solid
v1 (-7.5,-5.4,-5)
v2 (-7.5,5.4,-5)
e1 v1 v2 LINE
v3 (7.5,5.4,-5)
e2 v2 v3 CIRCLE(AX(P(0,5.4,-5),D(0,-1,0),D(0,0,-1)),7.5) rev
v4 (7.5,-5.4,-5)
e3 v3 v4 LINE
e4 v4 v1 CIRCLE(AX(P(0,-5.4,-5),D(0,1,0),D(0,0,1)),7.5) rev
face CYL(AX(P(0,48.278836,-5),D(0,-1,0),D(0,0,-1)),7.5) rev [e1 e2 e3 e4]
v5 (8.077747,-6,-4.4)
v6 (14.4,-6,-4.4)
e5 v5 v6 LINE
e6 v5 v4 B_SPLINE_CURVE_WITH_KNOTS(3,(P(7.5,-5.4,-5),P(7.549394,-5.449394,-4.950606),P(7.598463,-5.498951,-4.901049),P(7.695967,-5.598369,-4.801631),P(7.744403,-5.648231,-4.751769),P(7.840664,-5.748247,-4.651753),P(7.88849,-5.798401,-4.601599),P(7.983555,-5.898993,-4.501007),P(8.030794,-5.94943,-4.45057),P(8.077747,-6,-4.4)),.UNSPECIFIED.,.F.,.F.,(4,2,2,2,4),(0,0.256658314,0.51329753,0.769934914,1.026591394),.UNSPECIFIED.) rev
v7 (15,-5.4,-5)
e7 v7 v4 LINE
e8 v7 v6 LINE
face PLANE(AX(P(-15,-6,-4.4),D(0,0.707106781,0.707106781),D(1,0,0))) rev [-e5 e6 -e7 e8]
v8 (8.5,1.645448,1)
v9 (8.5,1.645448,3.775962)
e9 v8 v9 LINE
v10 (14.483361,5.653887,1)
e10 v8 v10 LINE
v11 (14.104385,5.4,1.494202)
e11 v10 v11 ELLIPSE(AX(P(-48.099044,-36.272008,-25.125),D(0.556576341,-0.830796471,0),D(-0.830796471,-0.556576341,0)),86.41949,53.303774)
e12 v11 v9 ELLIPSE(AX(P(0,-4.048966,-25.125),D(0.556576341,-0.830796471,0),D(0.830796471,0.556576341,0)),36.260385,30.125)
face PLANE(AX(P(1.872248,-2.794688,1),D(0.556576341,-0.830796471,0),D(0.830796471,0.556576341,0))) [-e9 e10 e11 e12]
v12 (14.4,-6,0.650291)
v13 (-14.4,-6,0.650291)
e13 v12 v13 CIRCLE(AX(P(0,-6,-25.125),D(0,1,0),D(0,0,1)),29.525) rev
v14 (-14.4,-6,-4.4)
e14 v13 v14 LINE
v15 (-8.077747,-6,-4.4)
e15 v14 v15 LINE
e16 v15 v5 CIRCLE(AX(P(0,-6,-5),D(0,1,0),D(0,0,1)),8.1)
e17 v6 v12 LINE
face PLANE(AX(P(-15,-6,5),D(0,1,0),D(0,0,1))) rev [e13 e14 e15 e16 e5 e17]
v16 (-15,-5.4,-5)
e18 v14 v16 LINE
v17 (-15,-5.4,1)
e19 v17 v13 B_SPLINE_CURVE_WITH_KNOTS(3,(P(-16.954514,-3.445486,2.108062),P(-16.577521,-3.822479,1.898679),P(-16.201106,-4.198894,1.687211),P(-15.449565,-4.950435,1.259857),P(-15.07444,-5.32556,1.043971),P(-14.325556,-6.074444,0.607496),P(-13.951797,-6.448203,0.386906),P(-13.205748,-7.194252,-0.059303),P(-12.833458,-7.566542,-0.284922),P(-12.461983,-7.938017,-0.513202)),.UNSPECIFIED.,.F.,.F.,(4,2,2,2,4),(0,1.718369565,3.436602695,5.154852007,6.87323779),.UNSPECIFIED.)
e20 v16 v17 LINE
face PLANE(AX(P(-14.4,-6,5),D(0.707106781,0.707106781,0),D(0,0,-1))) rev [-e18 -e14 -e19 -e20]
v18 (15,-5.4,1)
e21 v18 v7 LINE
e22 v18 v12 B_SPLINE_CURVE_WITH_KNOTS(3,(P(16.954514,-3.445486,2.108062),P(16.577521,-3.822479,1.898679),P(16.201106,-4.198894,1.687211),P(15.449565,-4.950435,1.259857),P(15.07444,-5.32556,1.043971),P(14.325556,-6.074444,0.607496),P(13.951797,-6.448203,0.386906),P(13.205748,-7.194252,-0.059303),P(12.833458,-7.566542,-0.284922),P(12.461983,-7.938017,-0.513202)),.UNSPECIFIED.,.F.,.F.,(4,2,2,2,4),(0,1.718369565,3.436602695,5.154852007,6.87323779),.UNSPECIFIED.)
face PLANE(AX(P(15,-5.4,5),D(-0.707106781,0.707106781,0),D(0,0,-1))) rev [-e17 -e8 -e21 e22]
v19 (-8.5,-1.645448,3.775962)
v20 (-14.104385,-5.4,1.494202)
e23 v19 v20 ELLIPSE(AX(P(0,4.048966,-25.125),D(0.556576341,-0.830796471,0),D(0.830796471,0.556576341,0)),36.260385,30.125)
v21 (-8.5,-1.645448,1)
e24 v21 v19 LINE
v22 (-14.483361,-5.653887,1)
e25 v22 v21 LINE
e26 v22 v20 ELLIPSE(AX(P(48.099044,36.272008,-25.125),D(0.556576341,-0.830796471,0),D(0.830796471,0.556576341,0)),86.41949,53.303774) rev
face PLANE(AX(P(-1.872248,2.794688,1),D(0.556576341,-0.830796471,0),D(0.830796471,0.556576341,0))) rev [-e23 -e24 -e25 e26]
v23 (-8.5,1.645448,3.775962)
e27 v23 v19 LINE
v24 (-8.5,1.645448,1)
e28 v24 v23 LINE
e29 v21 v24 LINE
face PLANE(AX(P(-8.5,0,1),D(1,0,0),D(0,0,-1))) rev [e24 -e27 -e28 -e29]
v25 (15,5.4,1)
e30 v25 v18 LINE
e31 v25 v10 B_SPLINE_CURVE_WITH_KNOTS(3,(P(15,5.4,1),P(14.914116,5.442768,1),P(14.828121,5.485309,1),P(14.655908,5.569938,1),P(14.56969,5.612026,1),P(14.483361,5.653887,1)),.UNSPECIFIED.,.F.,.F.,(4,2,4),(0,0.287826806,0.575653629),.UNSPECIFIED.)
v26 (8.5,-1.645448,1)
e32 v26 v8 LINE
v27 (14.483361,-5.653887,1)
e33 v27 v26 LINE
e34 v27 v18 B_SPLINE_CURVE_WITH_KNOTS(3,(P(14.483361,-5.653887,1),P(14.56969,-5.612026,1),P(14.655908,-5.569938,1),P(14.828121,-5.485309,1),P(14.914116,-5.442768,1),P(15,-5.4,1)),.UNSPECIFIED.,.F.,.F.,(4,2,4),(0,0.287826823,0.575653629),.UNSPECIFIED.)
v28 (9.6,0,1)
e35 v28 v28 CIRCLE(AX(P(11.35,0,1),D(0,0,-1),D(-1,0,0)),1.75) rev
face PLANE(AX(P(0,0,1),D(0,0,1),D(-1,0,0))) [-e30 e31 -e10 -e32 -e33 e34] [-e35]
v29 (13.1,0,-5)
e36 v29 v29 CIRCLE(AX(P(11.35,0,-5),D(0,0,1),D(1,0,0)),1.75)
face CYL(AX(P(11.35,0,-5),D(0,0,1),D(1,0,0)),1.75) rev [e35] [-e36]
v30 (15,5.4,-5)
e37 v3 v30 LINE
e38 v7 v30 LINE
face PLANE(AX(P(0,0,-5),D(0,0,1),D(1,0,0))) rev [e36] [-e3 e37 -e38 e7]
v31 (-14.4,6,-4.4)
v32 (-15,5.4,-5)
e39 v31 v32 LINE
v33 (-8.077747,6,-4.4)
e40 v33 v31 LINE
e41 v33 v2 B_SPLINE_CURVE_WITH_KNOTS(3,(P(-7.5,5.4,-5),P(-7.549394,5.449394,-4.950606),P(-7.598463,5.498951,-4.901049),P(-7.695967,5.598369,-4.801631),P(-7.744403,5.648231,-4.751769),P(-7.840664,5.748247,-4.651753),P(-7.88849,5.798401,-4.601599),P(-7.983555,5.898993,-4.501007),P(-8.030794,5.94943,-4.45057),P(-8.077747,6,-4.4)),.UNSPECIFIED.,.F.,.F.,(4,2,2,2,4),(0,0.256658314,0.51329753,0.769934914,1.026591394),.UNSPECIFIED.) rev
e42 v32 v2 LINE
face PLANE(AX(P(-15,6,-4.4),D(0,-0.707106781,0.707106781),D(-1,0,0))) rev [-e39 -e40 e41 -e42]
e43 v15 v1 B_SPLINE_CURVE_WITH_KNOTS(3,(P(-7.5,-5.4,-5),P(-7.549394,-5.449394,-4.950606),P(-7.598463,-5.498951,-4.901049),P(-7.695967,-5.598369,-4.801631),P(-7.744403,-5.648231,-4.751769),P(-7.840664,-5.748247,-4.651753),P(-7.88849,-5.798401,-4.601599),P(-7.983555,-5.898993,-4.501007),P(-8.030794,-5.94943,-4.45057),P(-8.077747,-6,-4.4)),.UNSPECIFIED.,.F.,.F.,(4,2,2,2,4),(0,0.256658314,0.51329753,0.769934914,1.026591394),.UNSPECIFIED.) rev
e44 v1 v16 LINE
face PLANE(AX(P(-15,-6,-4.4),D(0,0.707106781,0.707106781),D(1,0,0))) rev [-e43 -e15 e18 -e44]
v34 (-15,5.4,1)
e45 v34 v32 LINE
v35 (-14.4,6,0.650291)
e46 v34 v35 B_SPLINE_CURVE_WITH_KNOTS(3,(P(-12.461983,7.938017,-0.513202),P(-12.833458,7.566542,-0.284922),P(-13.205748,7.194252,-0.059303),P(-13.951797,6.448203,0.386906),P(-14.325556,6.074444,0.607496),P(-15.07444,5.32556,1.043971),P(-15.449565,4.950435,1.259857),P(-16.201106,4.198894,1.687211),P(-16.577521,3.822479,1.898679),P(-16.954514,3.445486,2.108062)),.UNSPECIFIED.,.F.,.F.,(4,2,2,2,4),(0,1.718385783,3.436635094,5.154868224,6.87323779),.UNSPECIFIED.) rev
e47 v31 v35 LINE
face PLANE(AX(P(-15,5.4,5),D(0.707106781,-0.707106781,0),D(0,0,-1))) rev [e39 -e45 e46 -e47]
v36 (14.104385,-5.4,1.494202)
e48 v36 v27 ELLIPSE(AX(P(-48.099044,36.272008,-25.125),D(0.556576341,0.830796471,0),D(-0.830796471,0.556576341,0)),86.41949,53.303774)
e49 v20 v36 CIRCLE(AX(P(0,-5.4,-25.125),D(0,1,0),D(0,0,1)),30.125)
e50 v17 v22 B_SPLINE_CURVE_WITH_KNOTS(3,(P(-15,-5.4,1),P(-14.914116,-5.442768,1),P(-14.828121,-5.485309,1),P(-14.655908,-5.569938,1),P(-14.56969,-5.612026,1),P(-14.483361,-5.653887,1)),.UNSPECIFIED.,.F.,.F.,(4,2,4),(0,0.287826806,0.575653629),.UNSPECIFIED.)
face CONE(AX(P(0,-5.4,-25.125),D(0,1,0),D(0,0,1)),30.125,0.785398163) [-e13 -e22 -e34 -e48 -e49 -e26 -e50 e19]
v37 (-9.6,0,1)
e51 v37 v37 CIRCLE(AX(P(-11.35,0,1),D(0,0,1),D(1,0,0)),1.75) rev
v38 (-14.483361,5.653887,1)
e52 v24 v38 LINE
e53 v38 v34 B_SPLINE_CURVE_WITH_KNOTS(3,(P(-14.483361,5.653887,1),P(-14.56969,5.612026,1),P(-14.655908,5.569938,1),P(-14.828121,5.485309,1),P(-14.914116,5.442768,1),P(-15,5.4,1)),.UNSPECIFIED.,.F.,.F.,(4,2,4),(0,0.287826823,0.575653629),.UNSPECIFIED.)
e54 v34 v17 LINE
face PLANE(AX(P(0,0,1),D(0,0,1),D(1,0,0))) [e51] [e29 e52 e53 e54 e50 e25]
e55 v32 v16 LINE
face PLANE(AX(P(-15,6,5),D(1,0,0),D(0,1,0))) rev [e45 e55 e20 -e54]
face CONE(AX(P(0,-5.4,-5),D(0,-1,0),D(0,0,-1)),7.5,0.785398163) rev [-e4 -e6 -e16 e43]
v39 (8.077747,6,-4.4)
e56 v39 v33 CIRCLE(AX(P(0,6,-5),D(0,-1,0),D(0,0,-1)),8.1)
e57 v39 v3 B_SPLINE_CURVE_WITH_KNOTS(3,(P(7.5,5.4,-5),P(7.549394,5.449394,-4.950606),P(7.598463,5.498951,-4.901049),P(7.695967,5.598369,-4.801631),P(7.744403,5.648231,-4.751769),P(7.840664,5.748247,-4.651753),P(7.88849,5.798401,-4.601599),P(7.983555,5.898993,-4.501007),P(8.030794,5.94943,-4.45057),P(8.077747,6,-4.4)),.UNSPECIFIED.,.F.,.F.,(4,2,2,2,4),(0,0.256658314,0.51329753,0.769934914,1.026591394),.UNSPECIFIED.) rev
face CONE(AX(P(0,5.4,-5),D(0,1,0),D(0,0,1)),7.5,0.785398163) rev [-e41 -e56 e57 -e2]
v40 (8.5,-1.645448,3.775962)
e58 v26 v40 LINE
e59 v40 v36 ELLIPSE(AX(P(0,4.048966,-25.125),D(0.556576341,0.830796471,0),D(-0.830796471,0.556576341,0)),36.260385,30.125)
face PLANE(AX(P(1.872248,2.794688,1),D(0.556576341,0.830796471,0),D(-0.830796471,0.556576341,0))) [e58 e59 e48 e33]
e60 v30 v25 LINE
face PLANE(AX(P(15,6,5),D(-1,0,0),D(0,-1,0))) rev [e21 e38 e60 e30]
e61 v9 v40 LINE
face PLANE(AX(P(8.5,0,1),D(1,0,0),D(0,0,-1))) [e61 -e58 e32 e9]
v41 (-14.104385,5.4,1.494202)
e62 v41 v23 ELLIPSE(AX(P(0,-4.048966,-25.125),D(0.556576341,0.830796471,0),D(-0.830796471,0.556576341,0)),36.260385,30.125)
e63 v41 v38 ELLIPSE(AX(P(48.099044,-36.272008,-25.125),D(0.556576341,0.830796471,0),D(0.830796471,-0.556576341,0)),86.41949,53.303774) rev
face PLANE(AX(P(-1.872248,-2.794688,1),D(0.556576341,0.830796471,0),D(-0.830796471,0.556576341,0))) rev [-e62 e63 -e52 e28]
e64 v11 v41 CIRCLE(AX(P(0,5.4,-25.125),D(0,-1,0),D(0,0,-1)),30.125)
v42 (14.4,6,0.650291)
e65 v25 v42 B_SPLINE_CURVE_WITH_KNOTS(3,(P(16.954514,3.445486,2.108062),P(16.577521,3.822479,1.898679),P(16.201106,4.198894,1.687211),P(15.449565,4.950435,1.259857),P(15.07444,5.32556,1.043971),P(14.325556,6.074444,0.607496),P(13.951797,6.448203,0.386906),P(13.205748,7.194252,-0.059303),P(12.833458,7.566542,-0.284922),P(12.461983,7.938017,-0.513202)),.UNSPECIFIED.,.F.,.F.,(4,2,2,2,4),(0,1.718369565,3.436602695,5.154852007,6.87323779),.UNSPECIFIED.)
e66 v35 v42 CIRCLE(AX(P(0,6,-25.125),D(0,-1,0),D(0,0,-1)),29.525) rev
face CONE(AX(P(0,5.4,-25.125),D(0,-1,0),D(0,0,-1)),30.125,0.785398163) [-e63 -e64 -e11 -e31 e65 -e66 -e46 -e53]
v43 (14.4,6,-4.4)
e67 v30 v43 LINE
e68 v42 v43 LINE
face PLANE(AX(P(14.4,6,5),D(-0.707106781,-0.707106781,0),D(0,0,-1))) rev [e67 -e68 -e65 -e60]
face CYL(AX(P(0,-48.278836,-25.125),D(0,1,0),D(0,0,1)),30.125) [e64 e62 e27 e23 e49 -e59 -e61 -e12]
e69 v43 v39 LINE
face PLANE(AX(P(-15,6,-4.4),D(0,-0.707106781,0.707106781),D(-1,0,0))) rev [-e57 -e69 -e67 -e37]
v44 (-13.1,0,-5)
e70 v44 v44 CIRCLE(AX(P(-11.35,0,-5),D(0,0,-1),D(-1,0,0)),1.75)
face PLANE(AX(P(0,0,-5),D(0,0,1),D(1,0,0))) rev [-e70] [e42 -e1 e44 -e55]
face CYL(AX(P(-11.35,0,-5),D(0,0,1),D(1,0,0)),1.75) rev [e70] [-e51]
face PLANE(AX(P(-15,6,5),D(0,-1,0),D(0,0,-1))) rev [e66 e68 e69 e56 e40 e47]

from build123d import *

# Parameters (mm, degrees)
ESBO_O1_W                  = 30
ESBO_O1_H                  = 12
RESSALTO_EXTRUS_O1_DEPTH   = 5
CORTE_EXTRUS_O1_DEPTH      = 20.849433241
CORTE_EXTRUS_O1_DEPTH_BACK = 20.849433241
ESBO_O3_R                  = 1.75
CORTE_EXTRUS_O2_DEPTH      = 20
ESBO_O4_R                  = 1.75
CORTE_EXTRUS_O3_DEPTH      = 4
CORTE_EXTRUS_O4_DEPTH      = 20.849433241
CORTE_EXTRUS_O4_DEPTH_BACK = 20.849433241
CHANFRO2_SIZE              = 0.6


with BuildPart() as part:
    # Esboço1 → Ressalto-extrusão1 (new, symmetric)
    with BuildSketch(Plane.XY):
        Rectangle(ESBO_O1_W, ESBO_O1_H)
    extrude(amount=RESSALTO_EXTRUS_O1_DEPTH, both=True)

    # Esboço2 → Corte-extrusão1 (cut, two sides: drawn at the far end of the back side and taken through both)
    with BuildSketch(Plane(origin=(0, 6, 0), x_dir=(1, 0, 0), z_dir=(0, 1, 0)).offset(-CORTE_EXTRUS_O1_DEPTH_BACK)):
        with BuildLine():
            Line((-7.5, 64.244289009), (-7.5, 5))
            ThreePointArc((-7.5, 5), (0, -2.5), (7.5, 5))
            Line((7.5, 5), (7.5, 64.244289009))
            Line((7.5, 64.244289009), (7.5, 182.732867027))
            Line((7.5, 182.732867027), (-7.5, 182.732867027))
            Line((-7.5, 182.732867027), (-7.5, 64.244289009))
        make_face()
    extrude(amount=CORTE_EXTRUS_O1_DEPTH + CORTE_EXTRUS_O1_DEPTH_BACK, mode=Mode.SUBTRACT)

    # Esboço3 → Corte-extrusão2 (cut, through all)
    with BuildSketch(Plane.XY.offset(5)):
        with Locations((11.35, 0)):
            Circle(ESBO_O3_R)
    corte_extrus_o2 = extrude(amount=-CORTE_EXTRUS_O2_DEPTH, mode=Mode.SUBTRACT)

    # Espelhar1: Corte-extrusão2 across plane
    add(corte_extrus_o2.mirror(Plane(origin=(0, 0, 0), x_dir=(0, 0, 1), z_dir=(1, 0, 0))), mode=Mode.SUBTRACT)

    # Esboço4 → Corte-extrusão3 (cut)
    # profile 1 of 2: a face of its own
    with BuildSketch(Plane.XY.offset(5)):
        Polygon((-15, -6), (-8.5, -1.645448267), (-11.35, -3.290896534), (-14.2, -1.645448267), (-14.2, 1.645448267), (-11.35, 3.290896534), (-8.5, 1.645448267), (-15, 6), align=None)
    # profile 2 of 2: a face of its own
    with BuildSketch(Plane.XY.offset(5)):
        Polygon((-11.35, -3.290896534), (-8.5, -1.645448267), (-8.5, 1.645448267), (-11.35, 3.290896534), (-14.2, 1.645448267), (-14.2, -1.645448267), align=None)
        with Locations((-11.35, 0)):
            Circle(ESBO_O4_R, mode=Mode.SUBTRACT)
    corte_extrus_o3 = extrude(amount=-CORTE_EXTRUS_O3_DEPTH, mode=Mode.SUBTRACT)

    # Espelhar2: Corte-extrusão3 across plane
    add(corte_extrus_o3.mirror(Plane(origin=(0, 0, 0), x_dir=(0, 0, 1), z_dir=(1, 0, 0))), mode=Mode.SUBTRACT)

    # Esboço5 → Corte-extrusão4 (cut, two sides: drawn at the far end of the back side and taken through both)
    with BuildSketch(Plane.XZ.offset(6).offset(-CORTE_EXTRUS_O4_DEPTH_BACK)):
        with BuildLine():
            Line((-76.735854523, -34.44642365), (-15, 1))
            ThreePointArc((-15, 1), (0, 5), (15, 1))
            Line((15, 1), (76.735854523, -34.44642365))
            Line((76.735854523, -34.44642365), (76.735854523, 107.930044677))
            Line((76.735854523, 107.930044677), (-76.735854523, 107.930044677))
            Line((-76.735854523, 107.930044677), (-76.735854523, -34.44642365))
        make_face()
    extrude(amount=CORTE_EXTRUS_O4_DEPTH + CORTE_EXTRUS_O4_DEPTH_BACK, mode=Mode.SUBTRACT)

    # Chanfro2
    # the kernel refuses this chamfer: 0.6 mm, written as the material it takes off along each edge
    with BuildSketch(Plane(origin=(-15, 6, -6.543009793), x_dir=(0.9996219169112968, 0.027495876610585904, 0), z_dir=(0, 0, 1)), Plane(origin=(15, 6, 2.543009793), x_dir=(-0.9996219169112968, 0.027495876610585824, 0), z_dir=(0, 0, -1))) as chanfro2_piece_1:
        Polygon((CHANFRO2_SIZE * 0.999621916911, -CHANFRO2_SIZE * 0.0274958766106), (-CHANFRO2_SIZE * 0.0274958766106, -CHANFRO2_SIZE * 0.999621916911), (0, 0), align=None)
    extrude(amount=9.086019586, mode=Mode.SUBTRACT)
    with BuildSketch(Plane(origin=(-16.543009793, 6, -5), x_dir=(0, 0.027495876610585942, 0.9996219169112968), z_dir=(1, 0, 0)), Plane(origin=(5.956990207, 6, -5), x_dir=(0, 0.027495876610585942, 0.9996219169112968), z_dir=(1, 0, 0)), Plane(origin=(16.543009793, -6, -5), x_dir=(0, -0.027495876610585942, 0.9996219169112968), z_dir=(-1, 0, 0)), Plane(origin=(-5.956990207, -6, -5), x_dir=(0, -0.027495876610585942, 0.9996219169112968), z_dir=(-1, 0, 0))) as chanfro2_piece_2:
        Polygon((CHANFRO2_SIZE * 0.999621916911, CHANFRO2_SIZE * 0.0274958766106), (-CHANFRO2_SIZE * 0.0274958766106, CHANFRO2_SIZE * 0.999621916911), (0, 0), align=None)
    extrude(amount=10.586019586, mode=Mode.SUBTRACT)
    with BuildSketch(Plane(origin=(0, 6, -5), x_dir=(0.9788435281484443, 0, -0.20461023288659222), z_dir=(-0.20461023288659222, 0, -0.9788435281484443))) as chanfro2_piece_3:
        Polygon((7.5 + CHANFRO2_SIZE, 0), (7.5, CHANFRO2_SIZE), (7.5, 0), align=None)
    revolve(axis=Axis((0, 6, -5), (0, -1, 0)), revolution_arc=203.613366819, mode=Mode.SUBTRACT)
    with BuildSketch(Plane(origin=(0, 6, -25.125), x_dir=(-0.5416797070080789, 0, 0.8405849719187476), z_dir=(-0.8405849719187476, 0, -0.5416797070080789))) as chanfro2_piece_4:
        Polygon((30.125 - CHANFRO2_SIZE, 0), (30.125, -CHANFRO2_SIZE), (30.125, 0), align=None)
    revolve(axis=Axis((0, 6, -25.125), (0, 1, 0)), revolution_arc=65.596114289, mode=Mode.SUBTRACT)
    with BuildSketch(Plane(origin=(0, -6, -5), x_dir=(0.9788435281484443, 0, -0.20461023288659222), z_dir=(-0.20461023288659222, 0, -0.9788435281484443))) as chanfro2_piece_5:
        Polygon((7.5 + CHANFRO2_SIZE, 0), (7.5, -CHANFRO2_SIZE), (7.5, 0), align=None)
    revolve(axis=Axis((0, -6, -5), (0, -1, 0)), revolution_arc=203.613366819, mode=Mode.SUBTRACT)
    with BuildSketch(Plane(origin=(-15, -6, -6.543009793), x_dir=(0.9996219169112968, -0.027495876610585824, 0), z_dir=(0, 0, 1)), Plane(origin=(15, -6, 2.543009793), x_dir=(-0.9996219169112968, -0.027495876610585904, 0), z_dir=(0, 0, -1))) as chanfro2_piece_6:
        Polygon((CHANFRO2_SIZE * 0.999621916911, CHANFRO2_SIZE * 0.0274958766106), (-CHANFRO2_SIZE * 0.0274958766106, CHANFRO2_SIZE * 0.999621916911), (0, 0), align=None)
    extrude(amount=9.086019586, mode=Mode.SUBTRACT)
    with BuildSketch(Plane(origin=(0, -6, -25.125), x_dir=(-0.5416797070080789, 0, 0.8405849719187476), z_dir=(-0.8405849719187476, 0, -0.5416797070080789))) as chanfro2_piece_7:
        Polygon((30.125, CHANFRO2_SIZE), (30.125 - CHANFRO2_SIZE, 0), (30.125, 0), align=None)
    revolve(axis=Axis((0, -6, -25.125), (0, 1, 0)), revolution_arc=65.596114289, mode=Mode.SUBTRACT)


solid = part.part
